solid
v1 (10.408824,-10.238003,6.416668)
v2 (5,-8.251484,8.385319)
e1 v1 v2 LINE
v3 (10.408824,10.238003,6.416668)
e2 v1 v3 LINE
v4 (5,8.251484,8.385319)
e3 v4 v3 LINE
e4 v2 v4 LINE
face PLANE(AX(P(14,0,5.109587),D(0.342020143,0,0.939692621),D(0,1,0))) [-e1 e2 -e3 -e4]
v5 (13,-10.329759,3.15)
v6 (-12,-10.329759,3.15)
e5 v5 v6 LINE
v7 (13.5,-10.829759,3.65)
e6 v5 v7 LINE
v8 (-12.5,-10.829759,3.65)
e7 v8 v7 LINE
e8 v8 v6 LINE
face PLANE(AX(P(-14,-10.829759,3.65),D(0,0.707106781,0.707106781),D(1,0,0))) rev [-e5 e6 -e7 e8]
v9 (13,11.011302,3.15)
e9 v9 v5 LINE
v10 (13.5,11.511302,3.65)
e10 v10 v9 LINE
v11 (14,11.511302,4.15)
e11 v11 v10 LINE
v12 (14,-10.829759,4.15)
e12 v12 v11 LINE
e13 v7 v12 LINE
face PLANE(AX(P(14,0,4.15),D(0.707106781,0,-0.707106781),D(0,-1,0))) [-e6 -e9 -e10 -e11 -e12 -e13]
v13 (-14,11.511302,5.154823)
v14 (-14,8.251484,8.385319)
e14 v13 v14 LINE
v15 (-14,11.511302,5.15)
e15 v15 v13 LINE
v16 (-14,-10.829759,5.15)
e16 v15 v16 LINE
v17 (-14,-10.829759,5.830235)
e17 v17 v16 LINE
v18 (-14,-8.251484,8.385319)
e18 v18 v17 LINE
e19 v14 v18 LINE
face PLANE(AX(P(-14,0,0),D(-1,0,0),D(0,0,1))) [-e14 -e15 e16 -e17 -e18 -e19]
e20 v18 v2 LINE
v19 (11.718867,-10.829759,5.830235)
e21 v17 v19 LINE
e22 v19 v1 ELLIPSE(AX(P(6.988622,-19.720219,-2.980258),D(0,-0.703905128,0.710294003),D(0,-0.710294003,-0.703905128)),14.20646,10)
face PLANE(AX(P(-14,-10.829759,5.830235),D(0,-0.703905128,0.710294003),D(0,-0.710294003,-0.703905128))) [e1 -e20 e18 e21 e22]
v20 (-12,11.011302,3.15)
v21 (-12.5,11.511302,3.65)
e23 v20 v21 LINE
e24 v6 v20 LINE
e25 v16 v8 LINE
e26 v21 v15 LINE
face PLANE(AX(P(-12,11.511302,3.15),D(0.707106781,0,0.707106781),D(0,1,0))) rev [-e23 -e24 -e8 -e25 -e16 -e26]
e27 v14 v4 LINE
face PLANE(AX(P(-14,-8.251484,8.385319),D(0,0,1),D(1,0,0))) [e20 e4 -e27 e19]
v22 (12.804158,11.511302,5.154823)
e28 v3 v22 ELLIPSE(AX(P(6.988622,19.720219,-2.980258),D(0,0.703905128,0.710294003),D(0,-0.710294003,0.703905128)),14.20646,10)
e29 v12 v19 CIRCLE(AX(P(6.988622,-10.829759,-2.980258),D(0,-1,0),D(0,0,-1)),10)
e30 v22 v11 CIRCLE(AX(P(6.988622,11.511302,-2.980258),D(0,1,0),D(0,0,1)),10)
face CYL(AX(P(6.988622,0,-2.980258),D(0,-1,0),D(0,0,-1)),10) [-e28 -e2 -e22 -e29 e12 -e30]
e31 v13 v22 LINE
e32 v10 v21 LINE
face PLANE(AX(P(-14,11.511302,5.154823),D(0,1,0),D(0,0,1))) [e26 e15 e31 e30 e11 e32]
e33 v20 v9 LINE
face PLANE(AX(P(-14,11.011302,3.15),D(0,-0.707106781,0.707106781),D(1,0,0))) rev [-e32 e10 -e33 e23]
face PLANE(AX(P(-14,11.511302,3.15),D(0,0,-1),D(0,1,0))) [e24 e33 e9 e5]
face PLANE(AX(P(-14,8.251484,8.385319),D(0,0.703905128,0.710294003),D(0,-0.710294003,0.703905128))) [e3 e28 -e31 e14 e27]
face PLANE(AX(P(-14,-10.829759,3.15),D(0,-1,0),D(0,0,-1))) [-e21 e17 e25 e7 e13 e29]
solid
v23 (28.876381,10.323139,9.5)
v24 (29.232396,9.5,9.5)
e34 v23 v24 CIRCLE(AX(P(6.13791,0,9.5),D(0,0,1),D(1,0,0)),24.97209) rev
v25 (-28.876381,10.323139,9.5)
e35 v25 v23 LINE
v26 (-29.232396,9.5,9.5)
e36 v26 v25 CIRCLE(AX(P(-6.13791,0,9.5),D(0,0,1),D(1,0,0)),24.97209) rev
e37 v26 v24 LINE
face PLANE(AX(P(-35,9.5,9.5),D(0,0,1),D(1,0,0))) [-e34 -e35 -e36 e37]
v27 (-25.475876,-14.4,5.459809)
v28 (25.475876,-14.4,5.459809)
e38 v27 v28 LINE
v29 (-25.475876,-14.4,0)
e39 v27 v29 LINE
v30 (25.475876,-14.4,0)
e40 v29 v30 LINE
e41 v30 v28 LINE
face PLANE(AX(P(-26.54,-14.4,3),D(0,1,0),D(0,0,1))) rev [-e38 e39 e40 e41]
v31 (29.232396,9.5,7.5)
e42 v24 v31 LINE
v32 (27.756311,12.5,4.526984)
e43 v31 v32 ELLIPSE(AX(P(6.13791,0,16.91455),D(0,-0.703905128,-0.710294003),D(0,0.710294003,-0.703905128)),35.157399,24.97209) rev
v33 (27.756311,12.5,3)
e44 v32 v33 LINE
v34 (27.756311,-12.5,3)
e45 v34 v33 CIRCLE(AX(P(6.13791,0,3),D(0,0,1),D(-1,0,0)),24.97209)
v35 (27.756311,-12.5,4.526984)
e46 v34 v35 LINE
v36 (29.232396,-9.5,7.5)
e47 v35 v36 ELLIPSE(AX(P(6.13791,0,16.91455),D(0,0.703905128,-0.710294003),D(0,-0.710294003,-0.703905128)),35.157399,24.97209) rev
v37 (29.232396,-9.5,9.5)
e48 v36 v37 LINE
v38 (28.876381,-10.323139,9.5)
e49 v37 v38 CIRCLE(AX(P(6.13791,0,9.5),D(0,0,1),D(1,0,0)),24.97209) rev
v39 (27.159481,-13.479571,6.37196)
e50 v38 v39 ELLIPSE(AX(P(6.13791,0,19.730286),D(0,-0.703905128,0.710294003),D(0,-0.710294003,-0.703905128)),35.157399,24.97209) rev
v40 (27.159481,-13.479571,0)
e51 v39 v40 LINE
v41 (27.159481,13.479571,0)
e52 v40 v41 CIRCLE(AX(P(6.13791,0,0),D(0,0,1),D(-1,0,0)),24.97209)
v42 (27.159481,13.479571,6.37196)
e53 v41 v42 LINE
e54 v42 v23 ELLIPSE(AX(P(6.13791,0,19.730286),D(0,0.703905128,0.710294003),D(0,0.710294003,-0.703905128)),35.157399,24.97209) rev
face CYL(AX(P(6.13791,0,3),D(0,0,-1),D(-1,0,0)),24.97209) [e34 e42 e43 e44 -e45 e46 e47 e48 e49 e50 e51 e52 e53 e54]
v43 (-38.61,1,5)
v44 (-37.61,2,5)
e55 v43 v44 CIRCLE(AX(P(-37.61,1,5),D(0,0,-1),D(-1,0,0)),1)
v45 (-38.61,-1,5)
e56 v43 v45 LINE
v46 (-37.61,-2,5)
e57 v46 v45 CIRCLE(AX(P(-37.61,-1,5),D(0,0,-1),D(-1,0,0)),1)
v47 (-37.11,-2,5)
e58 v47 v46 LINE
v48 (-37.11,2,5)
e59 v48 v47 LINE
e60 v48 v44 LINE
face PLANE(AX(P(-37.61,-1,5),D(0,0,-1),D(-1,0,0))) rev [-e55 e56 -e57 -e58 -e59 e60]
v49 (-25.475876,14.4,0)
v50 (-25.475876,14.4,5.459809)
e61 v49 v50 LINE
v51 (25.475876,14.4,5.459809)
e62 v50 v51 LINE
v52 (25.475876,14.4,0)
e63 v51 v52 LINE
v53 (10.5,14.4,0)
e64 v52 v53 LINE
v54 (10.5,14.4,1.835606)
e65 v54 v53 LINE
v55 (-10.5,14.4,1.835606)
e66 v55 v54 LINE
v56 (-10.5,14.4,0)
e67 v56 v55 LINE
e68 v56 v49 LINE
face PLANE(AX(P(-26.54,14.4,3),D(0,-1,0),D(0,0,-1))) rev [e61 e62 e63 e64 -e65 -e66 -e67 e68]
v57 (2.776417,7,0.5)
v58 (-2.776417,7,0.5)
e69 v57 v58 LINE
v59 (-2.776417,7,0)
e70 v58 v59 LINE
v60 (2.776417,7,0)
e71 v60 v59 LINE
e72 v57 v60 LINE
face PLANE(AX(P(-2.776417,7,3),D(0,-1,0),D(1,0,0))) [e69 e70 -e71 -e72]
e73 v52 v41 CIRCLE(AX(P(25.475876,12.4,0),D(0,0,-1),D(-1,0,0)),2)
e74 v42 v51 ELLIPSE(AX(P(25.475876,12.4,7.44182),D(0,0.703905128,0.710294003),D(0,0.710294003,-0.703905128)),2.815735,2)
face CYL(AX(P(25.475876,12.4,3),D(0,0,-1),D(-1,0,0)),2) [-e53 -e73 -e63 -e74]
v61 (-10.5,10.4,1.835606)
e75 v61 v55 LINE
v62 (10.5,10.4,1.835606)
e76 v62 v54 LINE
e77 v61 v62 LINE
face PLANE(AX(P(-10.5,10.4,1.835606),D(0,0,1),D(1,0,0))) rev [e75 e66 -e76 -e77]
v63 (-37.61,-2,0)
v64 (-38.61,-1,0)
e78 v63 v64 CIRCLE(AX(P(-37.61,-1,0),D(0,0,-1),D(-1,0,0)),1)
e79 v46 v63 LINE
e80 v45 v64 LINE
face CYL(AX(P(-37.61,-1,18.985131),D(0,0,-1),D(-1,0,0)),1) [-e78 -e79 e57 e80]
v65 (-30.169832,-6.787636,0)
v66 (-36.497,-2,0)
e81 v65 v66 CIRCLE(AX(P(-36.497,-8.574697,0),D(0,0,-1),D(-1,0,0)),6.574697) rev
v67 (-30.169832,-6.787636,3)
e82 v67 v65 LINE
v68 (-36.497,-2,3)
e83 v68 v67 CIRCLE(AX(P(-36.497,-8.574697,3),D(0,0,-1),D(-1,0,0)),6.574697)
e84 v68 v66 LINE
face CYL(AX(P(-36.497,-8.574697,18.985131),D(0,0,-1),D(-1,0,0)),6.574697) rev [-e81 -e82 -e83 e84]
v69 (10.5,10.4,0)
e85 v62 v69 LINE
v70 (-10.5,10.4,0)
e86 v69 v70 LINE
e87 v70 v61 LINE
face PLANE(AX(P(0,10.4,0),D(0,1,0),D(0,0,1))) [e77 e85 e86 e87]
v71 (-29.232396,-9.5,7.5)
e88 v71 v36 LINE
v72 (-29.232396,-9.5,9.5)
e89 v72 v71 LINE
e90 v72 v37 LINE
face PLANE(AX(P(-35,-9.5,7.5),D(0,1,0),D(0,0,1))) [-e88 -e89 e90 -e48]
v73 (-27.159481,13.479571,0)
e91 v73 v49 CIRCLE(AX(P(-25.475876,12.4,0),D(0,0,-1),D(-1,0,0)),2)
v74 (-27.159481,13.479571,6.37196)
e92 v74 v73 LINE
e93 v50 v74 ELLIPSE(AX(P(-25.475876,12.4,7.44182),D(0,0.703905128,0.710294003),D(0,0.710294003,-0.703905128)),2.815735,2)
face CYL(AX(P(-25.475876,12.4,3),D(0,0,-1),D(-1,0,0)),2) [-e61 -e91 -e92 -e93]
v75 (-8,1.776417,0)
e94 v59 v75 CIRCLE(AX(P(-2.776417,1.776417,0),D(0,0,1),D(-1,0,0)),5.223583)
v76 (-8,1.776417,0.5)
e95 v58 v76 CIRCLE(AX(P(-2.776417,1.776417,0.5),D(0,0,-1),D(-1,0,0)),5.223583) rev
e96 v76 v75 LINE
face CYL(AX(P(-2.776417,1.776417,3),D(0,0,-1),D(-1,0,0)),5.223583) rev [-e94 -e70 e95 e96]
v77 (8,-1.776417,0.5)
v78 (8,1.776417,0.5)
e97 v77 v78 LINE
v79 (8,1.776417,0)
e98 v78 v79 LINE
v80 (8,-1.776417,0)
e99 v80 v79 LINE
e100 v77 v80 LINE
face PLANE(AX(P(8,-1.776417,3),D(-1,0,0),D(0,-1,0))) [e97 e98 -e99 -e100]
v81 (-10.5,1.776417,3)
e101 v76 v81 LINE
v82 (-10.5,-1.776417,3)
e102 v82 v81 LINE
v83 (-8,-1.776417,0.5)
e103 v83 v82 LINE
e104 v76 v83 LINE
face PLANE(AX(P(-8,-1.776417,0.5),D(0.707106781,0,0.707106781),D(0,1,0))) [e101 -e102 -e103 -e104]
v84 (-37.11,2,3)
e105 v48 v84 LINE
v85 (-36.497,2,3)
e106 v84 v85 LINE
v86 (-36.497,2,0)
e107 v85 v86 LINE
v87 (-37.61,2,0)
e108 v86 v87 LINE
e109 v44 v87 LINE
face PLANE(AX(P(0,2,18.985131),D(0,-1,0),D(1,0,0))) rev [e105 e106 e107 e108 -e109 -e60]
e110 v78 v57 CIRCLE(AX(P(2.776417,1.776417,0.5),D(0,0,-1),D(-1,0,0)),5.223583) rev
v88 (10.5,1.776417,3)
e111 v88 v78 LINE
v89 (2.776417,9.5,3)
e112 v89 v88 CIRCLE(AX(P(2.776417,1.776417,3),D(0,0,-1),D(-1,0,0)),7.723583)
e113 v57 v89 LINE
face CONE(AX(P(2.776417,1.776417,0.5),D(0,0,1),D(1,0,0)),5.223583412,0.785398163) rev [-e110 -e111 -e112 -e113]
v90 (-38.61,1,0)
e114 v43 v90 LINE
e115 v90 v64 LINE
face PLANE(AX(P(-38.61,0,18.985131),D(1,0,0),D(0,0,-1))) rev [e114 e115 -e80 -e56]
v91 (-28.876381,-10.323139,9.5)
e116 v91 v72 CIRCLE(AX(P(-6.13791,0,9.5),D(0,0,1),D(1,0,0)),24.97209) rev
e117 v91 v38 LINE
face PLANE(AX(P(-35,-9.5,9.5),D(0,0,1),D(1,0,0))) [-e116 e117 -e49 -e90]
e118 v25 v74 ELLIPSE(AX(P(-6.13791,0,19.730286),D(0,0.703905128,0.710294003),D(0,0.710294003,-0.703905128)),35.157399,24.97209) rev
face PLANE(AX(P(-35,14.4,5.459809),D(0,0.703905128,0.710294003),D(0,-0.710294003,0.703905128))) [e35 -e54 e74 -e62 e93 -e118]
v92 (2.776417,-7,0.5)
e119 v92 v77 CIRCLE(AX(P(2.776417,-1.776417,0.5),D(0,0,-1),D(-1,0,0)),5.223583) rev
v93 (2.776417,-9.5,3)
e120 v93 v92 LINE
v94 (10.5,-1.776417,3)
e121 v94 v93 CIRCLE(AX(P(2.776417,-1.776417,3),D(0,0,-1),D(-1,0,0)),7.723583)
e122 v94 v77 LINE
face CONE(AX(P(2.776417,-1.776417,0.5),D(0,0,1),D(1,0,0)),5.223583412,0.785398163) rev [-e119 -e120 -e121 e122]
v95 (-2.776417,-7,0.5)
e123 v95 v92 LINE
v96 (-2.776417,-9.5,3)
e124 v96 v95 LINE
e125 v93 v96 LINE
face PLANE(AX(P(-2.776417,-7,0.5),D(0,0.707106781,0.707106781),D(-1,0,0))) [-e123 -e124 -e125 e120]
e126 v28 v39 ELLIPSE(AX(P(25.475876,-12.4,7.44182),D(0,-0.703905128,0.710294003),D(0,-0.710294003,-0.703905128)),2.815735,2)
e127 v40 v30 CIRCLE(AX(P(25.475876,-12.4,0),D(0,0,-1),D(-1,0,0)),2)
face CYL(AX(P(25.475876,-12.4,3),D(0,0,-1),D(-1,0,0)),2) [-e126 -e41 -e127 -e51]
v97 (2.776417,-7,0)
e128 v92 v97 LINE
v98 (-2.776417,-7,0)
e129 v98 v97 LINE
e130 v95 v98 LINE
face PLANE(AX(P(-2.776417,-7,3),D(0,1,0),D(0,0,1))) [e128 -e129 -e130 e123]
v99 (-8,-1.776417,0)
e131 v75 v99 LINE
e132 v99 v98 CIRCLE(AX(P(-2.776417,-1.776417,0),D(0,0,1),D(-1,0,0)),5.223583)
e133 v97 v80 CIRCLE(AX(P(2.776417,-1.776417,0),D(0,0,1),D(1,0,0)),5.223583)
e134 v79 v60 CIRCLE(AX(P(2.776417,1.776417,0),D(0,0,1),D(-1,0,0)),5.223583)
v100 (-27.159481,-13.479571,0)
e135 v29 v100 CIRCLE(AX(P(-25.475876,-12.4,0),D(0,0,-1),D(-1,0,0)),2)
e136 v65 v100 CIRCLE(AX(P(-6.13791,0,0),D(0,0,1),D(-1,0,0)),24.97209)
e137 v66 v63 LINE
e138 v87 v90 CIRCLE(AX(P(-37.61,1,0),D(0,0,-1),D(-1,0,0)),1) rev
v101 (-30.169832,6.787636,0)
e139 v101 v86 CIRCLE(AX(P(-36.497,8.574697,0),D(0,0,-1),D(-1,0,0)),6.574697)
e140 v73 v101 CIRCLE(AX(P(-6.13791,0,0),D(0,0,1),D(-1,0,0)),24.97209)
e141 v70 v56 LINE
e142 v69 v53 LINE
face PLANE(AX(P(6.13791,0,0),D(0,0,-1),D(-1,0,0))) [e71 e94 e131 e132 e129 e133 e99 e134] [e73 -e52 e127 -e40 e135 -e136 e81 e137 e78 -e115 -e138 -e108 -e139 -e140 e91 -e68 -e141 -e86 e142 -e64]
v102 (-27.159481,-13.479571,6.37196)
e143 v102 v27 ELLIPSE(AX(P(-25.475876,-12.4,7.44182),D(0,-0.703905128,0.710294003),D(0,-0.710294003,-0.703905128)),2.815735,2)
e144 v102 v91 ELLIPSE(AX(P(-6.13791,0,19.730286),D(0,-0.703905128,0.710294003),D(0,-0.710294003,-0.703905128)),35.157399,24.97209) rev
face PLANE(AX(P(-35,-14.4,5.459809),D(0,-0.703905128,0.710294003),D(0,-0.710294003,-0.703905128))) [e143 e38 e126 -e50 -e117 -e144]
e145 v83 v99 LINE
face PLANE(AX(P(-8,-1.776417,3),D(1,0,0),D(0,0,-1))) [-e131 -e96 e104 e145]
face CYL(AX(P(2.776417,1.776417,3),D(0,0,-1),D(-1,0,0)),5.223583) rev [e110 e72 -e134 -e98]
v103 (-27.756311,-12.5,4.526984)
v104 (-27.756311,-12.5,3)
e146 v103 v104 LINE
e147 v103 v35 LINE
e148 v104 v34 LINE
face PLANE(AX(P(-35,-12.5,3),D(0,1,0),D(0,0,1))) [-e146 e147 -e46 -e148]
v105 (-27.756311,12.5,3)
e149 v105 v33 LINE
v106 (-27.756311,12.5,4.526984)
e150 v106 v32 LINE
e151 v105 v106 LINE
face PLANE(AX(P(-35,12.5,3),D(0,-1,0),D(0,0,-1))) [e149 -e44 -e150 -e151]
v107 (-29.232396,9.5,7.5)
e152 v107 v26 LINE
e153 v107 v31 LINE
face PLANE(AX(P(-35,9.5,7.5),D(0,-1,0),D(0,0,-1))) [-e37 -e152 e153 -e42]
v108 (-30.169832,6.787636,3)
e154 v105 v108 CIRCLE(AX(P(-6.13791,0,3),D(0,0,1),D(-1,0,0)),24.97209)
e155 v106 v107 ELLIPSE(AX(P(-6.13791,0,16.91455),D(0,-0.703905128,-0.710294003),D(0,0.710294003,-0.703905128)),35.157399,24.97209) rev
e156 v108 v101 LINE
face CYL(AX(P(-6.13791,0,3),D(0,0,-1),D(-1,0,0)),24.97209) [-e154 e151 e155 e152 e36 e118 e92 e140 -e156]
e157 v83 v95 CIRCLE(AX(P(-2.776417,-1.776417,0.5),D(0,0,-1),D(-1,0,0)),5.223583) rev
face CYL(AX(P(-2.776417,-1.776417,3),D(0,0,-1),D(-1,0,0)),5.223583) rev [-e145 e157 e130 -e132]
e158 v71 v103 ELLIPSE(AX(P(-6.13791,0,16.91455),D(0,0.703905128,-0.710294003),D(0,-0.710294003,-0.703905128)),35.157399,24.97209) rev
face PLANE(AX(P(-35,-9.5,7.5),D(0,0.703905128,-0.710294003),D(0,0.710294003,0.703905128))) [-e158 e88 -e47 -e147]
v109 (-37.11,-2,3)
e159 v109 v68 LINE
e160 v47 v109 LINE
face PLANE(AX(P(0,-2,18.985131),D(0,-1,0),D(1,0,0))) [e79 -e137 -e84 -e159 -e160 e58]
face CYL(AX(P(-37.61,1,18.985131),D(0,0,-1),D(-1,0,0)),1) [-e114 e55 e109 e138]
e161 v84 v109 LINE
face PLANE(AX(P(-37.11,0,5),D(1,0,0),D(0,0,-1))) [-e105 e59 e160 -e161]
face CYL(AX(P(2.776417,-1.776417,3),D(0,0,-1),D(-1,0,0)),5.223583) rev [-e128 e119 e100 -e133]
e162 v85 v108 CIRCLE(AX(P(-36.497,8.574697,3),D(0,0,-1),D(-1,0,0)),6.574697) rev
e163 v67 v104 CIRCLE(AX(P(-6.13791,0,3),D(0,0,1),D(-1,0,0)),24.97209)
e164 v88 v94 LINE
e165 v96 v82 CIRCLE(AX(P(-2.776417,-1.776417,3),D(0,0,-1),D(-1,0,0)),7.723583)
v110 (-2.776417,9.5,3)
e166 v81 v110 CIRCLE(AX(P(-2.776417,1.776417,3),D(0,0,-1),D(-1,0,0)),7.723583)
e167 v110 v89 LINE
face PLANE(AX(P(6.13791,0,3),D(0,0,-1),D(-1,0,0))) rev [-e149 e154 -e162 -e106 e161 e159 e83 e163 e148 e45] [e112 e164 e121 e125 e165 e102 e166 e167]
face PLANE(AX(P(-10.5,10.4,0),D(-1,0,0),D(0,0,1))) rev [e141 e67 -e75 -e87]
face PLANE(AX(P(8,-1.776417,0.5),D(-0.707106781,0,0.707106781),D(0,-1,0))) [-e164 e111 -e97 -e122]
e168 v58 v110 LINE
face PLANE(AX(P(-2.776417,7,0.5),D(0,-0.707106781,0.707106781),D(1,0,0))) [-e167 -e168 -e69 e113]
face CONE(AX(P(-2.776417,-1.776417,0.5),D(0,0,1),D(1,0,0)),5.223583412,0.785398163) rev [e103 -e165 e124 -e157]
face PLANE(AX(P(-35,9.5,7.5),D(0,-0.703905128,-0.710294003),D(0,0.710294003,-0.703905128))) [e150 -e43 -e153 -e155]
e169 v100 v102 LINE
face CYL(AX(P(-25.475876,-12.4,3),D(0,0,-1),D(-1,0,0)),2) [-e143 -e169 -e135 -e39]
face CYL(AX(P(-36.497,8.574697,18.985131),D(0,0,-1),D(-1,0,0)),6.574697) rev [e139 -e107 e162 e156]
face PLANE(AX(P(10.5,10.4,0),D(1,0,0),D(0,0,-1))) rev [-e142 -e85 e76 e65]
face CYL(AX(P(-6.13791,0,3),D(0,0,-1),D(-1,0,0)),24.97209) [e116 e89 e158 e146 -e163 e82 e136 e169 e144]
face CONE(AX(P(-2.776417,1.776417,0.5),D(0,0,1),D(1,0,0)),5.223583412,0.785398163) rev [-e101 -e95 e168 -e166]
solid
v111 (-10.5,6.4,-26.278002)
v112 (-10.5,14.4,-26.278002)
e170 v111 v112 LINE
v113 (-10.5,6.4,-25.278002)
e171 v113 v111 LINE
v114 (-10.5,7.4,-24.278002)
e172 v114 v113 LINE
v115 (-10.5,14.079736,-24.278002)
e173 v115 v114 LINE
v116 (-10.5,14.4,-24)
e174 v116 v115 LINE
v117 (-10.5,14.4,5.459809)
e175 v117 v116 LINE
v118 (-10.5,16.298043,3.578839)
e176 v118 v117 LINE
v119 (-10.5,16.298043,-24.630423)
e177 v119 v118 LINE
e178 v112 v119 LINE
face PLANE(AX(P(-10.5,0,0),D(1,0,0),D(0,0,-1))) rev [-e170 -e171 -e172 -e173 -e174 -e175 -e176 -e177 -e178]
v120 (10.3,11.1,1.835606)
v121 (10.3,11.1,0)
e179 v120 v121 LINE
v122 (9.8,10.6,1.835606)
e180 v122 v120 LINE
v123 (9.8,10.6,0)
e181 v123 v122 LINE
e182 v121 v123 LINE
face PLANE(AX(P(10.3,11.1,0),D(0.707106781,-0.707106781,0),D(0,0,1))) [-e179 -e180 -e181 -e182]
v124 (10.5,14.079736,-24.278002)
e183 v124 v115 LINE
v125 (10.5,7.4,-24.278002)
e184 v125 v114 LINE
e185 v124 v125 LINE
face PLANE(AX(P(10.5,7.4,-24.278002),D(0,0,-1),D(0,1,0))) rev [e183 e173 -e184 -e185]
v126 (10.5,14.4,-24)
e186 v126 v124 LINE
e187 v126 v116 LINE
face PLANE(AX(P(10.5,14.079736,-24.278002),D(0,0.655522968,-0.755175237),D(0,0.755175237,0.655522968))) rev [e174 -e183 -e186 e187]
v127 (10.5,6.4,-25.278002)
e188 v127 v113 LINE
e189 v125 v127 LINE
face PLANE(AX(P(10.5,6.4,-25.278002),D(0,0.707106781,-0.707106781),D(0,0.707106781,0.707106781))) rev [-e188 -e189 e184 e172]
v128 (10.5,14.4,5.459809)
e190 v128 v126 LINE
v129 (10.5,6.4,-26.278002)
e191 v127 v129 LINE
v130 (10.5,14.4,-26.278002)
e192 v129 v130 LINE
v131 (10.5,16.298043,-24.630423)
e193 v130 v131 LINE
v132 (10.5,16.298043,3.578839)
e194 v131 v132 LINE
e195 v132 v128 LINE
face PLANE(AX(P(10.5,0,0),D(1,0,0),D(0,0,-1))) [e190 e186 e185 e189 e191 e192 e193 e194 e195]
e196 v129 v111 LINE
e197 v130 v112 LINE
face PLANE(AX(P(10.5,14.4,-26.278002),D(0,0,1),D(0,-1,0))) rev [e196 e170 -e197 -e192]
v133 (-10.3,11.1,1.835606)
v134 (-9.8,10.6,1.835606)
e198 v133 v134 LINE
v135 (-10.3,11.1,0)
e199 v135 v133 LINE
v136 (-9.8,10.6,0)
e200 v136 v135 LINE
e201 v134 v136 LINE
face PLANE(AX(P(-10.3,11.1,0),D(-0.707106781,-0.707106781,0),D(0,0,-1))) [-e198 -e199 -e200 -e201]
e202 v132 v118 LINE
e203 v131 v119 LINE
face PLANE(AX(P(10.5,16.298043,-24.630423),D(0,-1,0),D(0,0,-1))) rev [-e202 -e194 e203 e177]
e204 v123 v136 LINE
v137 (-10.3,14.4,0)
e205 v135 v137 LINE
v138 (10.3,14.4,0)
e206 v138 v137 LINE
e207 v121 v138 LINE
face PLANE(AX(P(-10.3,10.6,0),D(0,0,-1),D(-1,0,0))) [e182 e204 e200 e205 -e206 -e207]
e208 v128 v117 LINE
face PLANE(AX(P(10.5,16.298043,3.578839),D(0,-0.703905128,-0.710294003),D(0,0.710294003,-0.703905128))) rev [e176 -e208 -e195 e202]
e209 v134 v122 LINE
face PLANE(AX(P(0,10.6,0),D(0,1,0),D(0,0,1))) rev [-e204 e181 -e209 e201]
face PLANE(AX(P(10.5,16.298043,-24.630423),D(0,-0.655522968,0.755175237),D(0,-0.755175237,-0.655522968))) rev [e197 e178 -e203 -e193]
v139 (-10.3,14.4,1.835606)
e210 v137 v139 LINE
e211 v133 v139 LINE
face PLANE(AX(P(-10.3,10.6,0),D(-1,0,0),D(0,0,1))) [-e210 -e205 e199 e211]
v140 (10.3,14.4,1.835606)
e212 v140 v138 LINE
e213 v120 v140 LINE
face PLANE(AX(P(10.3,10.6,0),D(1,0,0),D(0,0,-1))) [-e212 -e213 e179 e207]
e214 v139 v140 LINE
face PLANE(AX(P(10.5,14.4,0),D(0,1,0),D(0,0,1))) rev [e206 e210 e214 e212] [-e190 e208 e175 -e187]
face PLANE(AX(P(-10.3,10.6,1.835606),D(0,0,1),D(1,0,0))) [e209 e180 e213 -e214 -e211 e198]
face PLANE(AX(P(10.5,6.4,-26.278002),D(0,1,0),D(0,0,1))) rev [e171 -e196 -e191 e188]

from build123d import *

# Parameters (mm, degrees)
BOSS_EXTRUDE1_DEPTH      = 3
CHAMFER1_SIZE            = 2.5
BOSS_EXTRUDE2_DEPTH      = 33
BOSS_EXTRUDE2_DEPTH_BACK = 35
SKETCH1_3_OUTSIDE_W      = 84.892
SKETCH1_3_OUTSIDE_H      = 45.692
CUT_EXTRUDE3_DEPTH       = 33
BOSS_EXTRUDE3_DEPTH      = 14
BOSS_EXTRUDE3_DEPTH_BACK = 14
CHAMFER3_SIZE            = 0.5
BOSS_EXTRUDE4_DEPTH      = 3
BOSS_EXTRUDE5_START      = -3
BOSS_EXTRUDE5_DEPTH      = 2
FILLET2_R                = 2
BOSS_EXTRUDE6_DEPTH      = 10.5
BOSS_EXTRUDE6_DEPTH_BACK = 10.5
SKETCH6_W                = 21
SKETCH6_H                = 1.835605581
CUT_EXTRUDE4_DEPTH       = 4
SKETCH7_W                = 20.6
SKETCH7_H                = 1.835605581
BOSS_EXTRUDE8_DEPTH      = 3.8
CHAMFER9_SIZE            = 0.5
CHAMFER10_SIZE           = 9
CHAMFER10_SIZE2          = 3.275732108
CHAMFER11_SIZE           = 1
CHAMFER12_SIZE           = 2
FILLET3_R                = 10


with BuildPart() as part:
    # Sketch1 → Boss-Extrude1 (new body)
    with BuildSketch(Plane.XY):
        with BuildLine():
            Line((-26.54, -14.4), (26.54, -14.4))
            ThreePointArc((26.54, -14.4), (31.11, 0), (26.54, 14.4))
            Line((26.54, 14.4), (-26.54, 14.4))
            ThreePointArc((-26.54, 14.4), (-31.11, 0), (-26.54, -14.4))
        make_face()
        with BuildLine():
            Line((-2.776416588, -7), (2.776416588, -7))
            ThreePointArc((2.776416588, -7), (6.470047841, -5.470047841), (8, -1.776416588))
            Line((8, -1.776416588), (8, 1.776416588))
            ThreePointArc((8, 1.776416588), (6.470047841, 5.470047841), (2.776416588, 7))
            Line((2.776416588, 7), (-2.776416588, 7))
            ThreePointArc((-2.776416588, 7), (-6.470047841, 5.470047841), (-8, 1.776416588))
            Line((-8, 1.776416588), (-8, -1.776416588))
            ThreePointArc((-8, -1.776416588), (-6.470047841, -5.470047841), (-2.776416588, -7))
        make_face(mode=Mode.SUBTRACT)
    extrude(amount=BOSS_EXTRUDE1_DEPTH)

    # Chamfer1
    chamfer1_edges = [part.edges().sort_by_distance(p)[0] for p in [
        (6.470047841, 5.470047841, 3),
        (0, 7, 3),
        (-6.470047841, 5.470047841, 3),
        (-8, 0, 3),
        (-6.470047841, -5.470047841, 3),
        (0, -7, 3),
        (6.470047841, -5.470047841, 3),
        (8, 0, 3),
    ]]
    chamfer(chamfer1_edges, length=CHAMFER1_SIZE)

    # Sketch2 → Boss-Extrude2 (add, two sides: drawn at the far end of the back side and taken through both)
    with BuildSketch(Plane(origin=(0, 0, 0), x_dir=(0, 0, -1), z_dir=(1, 0, 0)).offset(-BOSS_EXTRUDE2_DEPTH_BACK)):
        Polygon((-7.5, -9.5), (-4.526984069, -12.5), (-3, -12.5), (-3, -14.4), (-5.459809425, -14.4), (-9.5, -10.323139329), (-9.5, -9.5), align=None)
        Polygon((-5.459809425, 14.4), (-9.5, 10.323139329), (-9.5, 9.5), (-7.5, 9.5), (-4.526984069, 12.5), (-3, 12.5), (-3, 14.4), align=None)
    extrude(amount=BOSS_EXTRUDE2_DEPTH + BOSS_EXTRUDE2_DEPTH_BACK)

    # Sketch1<3> outside → Cut-Extrude3 (cut)
    # profile 1 of 2: a face of its own
    with BuildSketch(Plane.XY):
        with Locations((-1, 0)):
            Rectangle(SKETCH1_3_OUTSIDE_W, SKETCH1_3_OUTSIDE_H)
        with BuildLine():
            Line((-26.54, -14.4), (26.54, -14.4))
            ThreePointArc((26.54, -14.4), (31.11, 0), (26.54, 14.4))
            Line((26.54, 14.4), (-26.54, 14.4))
            ThreePointArc((-26.54, 14.4), (-31.11, 0), (-26.54, -14.4))
        make_face(mode=Mode.SUBTRACT)
    # profile 2 of 2: a face of its own
    with BuildSketch(Plane.XY):
        with BuildLine():
            Line((-2.776416588, -7), (2.776416588, -7))
            ThreePointArc((2.776416588, -7), (6.470047841, -5.470047841), (8, -1.776416588))
            Line((8, -1.776416588), (8, 1.776416588))
            ThreePointArc((8, 1.776416588), (6.470047841, 5.470047841), (2.776416588, 7))
            Line((2.776416588, 7), (-2.776416588, 7))
            ThreePointArc((-2.776416588, 7), (-6.470047841, 5.470047841), (-8, 1.776416588))
            Line((-8, 1.776416588), (-8, -1.776416588))
            ThreePointArc((-8, -1.776416588), (-6.470047841, -5.470047841), (-2.776416588, -7))
        make_face()
    extrude(amount=CUT_EXTRUDE3_DEPTH, mode=Mode.SUBTRACT)

    # Sketch4 → Boss-Extrude4 (add)
    with BuildSketch(Plane(origin=(0, 0, 0), x_dir=(-1, 0, 0), z_dir=(0, 0, -1))):
        with BuildLine():
            ThreePointArc((30.169832116, -6.787635659), (32.529805878, -3.331795741), (36.496999573, -2))
            Line((36.496999573, -2), (37.11, -2))
            Line((37.11, -2), (37.11, 2))
            Line((37.11, 2), (36.496999573, 2))
            ThreePointArc((36.496999573, 2), (32.529805878, 3.331795741), (30.169832116, 6.787635659))
            ThreePointArc((30.169832116, 6.787635659), (31.11, 0), (30.169832116, -6.787635659))
        make_face()
        with BuildLine():
            Line((37.11, 2), (37.11, -2))
            Line((37.11, -2), (37.61, -2))
            ThreePointArc((37.61, -2), (38.317106781, -1.707106781), (38.61, -1))
            Line((38.61, -1), (38.61, 1))
            ThreePointArc((38.61, 1), (38.317106781, 1.707106781), (37.61, 2))
            Line((37.61, 2), (37.11, 2))
        make_face()
    extrude(amount=-BOSS_EXTRUDE4_DEPTH)

    # Sketch4<3> → Boss-Extrude5 (add)
    with BuildSketch(Plane(origin=(0, 0, 0), x_dir=(-1, 0, 0), z_dir=(0, 0, -1)).offset(BOSS_EXTRUDE5_START)):
        with BuildLine():
            Line((37.11, 2), (37.11, -2))
            Line((37.11, -2), (37.61, -2))
            ThreePointArc((37.61, -2), (38.317106781, -1.707106781), (38.61, -1))
            Line((38.61, -1), (38.61, 1))
            ThreePointArc((38.61, 1), (38.317106781, 1.707106781), (37.61, 2))
            Line((37.61, 2), (37.11, 2))
        make_face()
    extrude(amount=-BOSS_EXTRUDE5_DEPTH)

    # Fillet2
    fillet2_edges = [part.edges().sort_by_distance(p)[0] for p in [
        (-26.54, -14.4, 2.729904712),
        (-26.54, 14.4, 2.729904712),
        (26.54, 14.4, 2.729904712),
        (26.54, -14.4, 2.729904712),
    ]]
    fillet(fillet2_edges, radius=FILLET2_R)

    # Sketch6 → Cut-Extrude4 (cut)
    with BuildSketch(Plane(origin=(0, 14.4, 0), x_dir=(1, 0, 0), z_dir=(0, 1, 0))):
        with Locations((0, -0.917802791)):
            Rectangle(SKETCH6_W, SKETCH6_H)
    extrude(amount=-CUT_EXTRUDE4_DEPTH, mode=Mode.SUBTRACT)


with BuildPart() as body_2:
    # Sketch3 → Boss-Extrude3 (new, two sides: drawn at the far end of the back side and taken through both)
    with BuildSketch(Plane(origin=(0, 0, 0), x_dir=(0, 0, -1), z_dir=(1, 0, 0)).offset(-BOSS_EXTRUDE3_DEPTH_BACK)):
        Polygon((-3.15, 11.511301569), (-3.15, -10.829758909), (-5.830234929, -10.829758909), (-8.385318876, -8.251484181), (-8.385318876, 8.251484181), (-5.154822534, 11.511301569), align=None)
    extrude(amount=BOSS_EXTRUDE3_DEPTH + BOSS_EXTRUDE3_DEPTH_BACK)

    # Chamfer3
    chamfer3_edges = [body_2.edges().sort_by_distance(p)[0] for p in [
        (0, 11.511301569, 3.15),
        (0, -10.829758909, 3.15),
    ]]
    chamfer(chamfer3_edges, length=CHAMFER3_SIZE)

    # Chamfer10
    chamfer10_edges = [body_2.edges().sort_by_distance(p)[0] for p in [
        (14, 0, 8.385318876),
    ]]
    chamfer10_side = [body_2.faces().sort_by_distance(p)[0] for p in [
        (0, 0, 8.385318876),
    ]]
    chamfer(chamfer10_edges, length=CHAMFER10_SIZE, length2=CHAMFER10_SIZE2, reference=chamfer10_side[0])

    # Chamfer11
    chamfer11_edges = [body_2.edges().sort_by_distance(p)[0] for p in [
        (14, 0.34077133, 3.15),
    ]]
    chamfer(chamfer11_edges, length=CHAMFER11_SIZE)

    # Chamfer12
    chamfer12_edges = [body_2.edges().sort_by_distance(p)[0] for p in [
        (-14, 0.34077133, 3.15),
    ]]
    chamfer(chamfer12_edges, length=CHAMFER12_SIZE)

    # Fillet3
    # the kernel refuses this fillet: 10 mm, written as the material it takes off along each edge
    with BuildSketch(Plane(origin=(14, -20.383884151, 5.109586768), x_dir=(0, 0, -1), z_dir=(0, 1, 0))) as fillet3_piece_1:
        with BuildLine():
            CenterArc((8.089844894, 7.011377828), FILLET3_R, 200, 24.518359904)
            Line((-1.307081314, 3.591176395), (-1.495019838, 3.522772366))
            Line((-1.495019838, 3.522772366), (-0.187938524, -0.068404029))
            Line((-0.187938524, -0.068404029), (0, -0.2))
            ThreePointArc((0, -0.2), (0.479793384, -0.2), (0.816981605, -0.140227557))
            Line((0.816981605, -0.140227557), (0.959586768, 0))
        make_face()
    extrude(amount=41.449310961, mode=Mode.SUBTRACT)


with BuildPart() as body_3:
    # Sketch5 → Boss-Extrude6 (new, two sides: drawn at the far end of the back side and taken through both)
    with BuildSketch(Plane(origin=(0, 0, 0), x_dir=(0, 0, -1), z_dir=(1, 0, 0)).offset(-BOSS_EXTRUDE6_DEPTH_BACK)):
        Polygon((0, 14.4), (24, 14.4), (24.278001924, 14.079736365), (24.278001924, 7.4), (25.278001924, 6.4), (26.278001924, 6.4), (26.278001924, 14.4), (24.630423167, 16.298042842), (-3.578838889, 16.298042842), (-5.459809425, 14.4), align=None)
    extrude(amount=BOSS_EXTRUDE6_DEPTH + BOSS_EXTRUDE6_DEPTH_BACK)

    # Sketch7 → Boss-Extrude8 (add)
    with BuildSketch(Plane(origin=(0, 14.4, 0), x_dir=(1, 0, 0), z_dir=(0, 1, 0))):
        with Locations((0, -0.917802791)):
            Rectangle(SKETCH7_W, SKETCH7_H)
    extrude(amount=-BOSS_EXTRUDE8_DEPTH)

    # Chamfer9
    chamfer9_edges = [body_3.edges().sort_by_distance(p)[0] for p in [
        (-10.3, 10.6, 0.91780279),
        (10.3, 10.6, 0.91780279),
    ]]
    chamfer(chamfer9_edges, length=CHAMFER9_SIZE)


solid = Compound([part.part, body_2.part, body_3.part])
